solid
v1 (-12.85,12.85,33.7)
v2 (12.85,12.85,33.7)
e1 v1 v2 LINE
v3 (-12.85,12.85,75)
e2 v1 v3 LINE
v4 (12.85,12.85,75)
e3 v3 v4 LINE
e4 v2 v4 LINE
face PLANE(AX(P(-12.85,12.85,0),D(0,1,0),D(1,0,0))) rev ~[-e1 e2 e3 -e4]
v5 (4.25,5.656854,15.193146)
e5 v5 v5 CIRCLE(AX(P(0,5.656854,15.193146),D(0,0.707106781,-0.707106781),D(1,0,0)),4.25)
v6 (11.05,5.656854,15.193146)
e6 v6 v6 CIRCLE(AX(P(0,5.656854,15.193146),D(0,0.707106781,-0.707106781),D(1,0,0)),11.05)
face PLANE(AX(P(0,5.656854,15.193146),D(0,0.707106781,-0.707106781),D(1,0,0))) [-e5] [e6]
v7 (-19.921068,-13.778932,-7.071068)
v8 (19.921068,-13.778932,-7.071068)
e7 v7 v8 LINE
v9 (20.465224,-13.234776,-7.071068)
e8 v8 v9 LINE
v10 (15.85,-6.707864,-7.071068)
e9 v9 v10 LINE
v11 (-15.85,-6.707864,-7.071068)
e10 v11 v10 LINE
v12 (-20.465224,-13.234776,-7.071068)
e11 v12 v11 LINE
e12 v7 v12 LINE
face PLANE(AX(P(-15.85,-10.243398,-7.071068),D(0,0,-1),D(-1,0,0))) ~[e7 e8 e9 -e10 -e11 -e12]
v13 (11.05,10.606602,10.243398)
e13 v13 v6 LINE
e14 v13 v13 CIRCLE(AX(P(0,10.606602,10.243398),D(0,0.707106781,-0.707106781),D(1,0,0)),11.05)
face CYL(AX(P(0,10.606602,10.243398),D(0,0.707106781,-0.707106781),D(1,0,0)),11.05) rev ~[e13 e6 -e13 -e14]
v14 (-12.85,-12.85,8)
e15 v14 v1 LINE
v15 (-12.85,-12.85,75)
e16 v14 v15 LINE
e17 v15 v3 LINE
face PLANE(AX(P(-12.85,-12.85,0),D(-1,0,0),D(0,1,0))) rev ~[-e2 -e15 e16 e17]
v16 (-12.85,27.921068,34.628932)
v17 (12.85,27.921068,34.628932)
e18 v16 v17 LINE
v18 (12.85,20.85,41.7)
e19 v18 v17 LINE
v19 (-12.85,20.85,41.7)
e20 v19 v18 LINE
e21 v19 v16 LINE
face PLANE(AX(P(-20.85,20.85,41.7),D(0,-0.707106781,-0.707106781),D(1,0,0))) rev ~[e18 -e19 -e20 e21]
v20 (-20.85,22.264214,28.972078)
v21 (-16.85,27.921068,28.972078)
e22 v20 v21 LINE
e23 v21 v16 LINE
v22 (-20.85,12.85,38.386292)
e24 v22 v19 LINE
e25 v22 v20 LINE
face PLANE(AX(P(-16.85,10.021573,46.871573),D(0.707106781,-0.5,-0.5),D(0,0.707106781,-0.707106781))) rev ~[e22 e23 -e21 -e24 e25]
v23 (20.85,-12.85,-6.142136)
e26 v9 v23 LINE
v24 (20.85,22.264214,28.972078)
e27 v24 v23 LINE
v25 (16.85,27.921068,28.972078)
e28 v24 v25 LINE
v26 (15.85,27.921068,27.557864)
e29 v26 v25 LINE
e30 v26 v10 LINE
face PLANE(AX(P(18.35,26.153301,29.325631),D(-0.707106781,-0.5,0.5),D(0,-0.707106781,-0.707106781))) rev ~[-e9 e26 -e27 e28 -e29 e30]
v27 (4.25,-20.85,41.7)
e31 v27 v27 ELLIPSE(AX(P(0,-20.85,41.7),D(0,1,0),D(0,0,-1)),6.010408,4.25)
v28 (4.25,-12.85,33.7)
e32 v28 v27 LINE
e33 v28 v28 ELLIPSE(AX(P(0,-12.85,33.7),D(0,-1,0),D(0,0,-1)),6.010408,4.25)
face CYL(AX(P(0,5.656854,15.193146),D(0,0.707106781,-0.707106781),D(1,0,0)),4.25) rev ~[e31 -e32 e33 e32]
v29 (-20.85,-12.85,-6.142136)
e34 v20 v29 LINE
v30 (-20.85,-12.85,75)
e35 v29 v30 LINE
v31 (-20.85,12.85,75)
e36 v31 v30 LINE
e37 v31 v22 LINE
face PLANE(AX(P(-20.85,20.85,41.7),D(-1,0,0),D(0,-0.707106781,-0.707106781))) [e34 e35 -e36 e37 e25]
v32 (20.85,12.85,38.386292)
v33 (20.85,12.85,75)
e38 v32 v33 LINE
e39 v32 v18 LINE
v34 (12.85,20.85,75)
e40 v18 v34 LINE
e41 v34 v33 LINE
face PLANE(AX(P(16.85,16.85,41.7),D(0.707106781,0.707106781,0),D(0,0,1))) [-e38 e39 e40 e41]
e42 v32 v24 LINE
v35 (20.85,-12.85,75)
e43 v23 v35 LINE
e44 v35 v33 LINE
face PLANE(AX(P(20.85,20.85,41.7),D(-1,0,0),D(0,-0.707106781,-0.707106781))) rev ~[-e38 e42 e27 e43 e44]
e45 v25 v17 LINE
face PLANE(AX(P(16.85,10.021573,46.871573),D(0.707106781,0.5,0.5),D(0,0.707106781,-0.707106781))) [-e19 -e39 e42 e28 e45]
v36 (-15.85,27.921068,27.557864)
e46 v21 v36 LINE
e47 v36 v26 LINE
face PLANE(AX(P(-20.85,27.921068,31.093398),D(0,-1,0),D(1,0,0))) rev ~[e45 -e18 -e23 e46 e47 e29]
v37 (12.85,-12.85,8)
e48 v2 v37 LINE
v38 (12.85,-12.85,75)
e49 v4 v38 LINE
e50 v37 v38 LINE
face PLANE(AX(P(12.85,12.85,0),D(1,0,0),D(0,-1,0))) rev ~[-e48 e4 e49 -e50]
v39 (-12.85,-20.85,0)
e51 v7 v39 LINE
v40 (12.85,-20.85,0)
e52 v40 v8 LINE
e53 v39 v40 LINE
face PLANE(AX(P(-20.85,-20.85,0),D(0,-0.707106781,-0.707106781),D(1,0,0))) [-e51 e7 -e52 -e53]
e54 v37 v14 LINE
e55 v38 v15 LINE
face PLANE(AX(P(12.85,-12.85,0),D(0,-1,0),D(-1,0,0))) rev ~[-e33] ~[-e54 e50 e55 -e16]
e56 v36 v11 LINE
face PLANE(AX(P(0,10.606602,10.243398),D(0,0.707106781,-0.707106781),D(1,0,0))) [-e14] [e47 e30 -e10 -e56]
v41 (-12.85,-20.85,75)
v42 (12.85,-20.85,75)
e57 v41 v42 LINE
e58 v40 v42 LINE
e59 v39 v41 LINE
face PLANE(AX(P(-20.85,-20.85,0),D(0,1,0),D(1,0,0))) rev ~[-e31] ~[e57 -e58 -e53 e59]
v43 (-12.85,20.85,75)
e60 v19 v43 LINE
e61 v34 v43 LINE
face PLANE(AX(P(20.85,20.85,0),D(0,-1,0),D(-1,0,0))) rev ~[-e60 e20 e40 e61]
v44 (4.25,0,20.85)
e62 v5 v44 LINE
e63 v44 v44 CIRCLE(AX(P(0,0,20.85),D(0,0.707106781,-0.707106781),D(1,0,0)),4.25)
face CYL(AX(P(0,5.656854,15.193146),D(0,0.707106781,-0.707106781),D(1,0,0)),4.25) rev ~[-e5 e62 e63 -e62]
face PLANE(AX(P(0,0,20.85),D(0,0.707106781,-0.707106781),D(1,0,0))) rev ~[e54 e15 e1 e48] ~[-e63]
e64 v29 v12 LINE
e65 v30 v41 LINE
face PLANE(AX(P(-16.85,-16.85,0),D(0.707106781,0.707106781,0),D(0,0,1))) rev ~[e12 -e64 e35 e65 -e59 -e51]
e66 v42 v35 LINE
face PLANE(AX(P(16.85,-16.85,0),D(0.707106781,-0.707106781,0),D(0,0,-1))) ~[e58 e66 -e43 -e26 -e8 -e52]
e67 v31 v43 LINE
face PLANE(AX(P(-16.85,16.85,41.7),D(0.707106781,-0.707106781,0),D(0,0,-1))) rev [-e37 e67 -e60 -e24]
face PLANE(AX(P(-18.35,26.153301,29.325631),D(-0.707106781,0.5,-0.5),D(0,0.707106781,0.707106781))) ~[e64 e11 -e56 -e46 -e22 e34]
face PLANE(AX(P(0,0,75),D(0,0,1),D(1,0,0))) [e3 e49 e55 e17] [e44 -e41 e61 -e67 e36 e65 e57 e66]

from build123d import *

# Parameters (mm, degrees)
F1_DEPTH    = 75
F3_DEPTH    = 41.701
F4_W        = 41.7
F4_H        = 58.972705551
F5_DEPTH    = 15
F6_R        = 11.05
F7_DEPTH    = 7
F8_R        = 4.25
F9_DEPTH    = 61.034008589
F10_SIZE    = 8
F12_C1_SIZE = 5
F12_C2_SIZE = 5
F12_C3_SIZE = 5
F12_C4_SIZE = 5
F13_SIZE    = 8


with BuildPart() as f1:
    # F0 (on Top) → F1 (new body)
    with BuildSketch(Plane.XY):
        Polygon((20.85, 20.85), (0, 20.85), (-20.85, 20.85), (-20.85, 0), (-20.85, -20.85), (0, -20.85), (20.85, -20.85), (20.85, 0), align=None)
        Polygon((-12.85, 12.85), (0, 12.85), (12.85, 12.85), (12.85, 0), (12.85, -12.85), (0, -12.85), (-12.85, -12.85), (-12.85, 0), align=None, mode=Mode.SUBTRACT)
    extrude(amount=F1_DEPTH)

    # F2 (on face) → F3 (cut, through all)
    with BuildSketch(Plane(origin=(-20.85, 0, 0), x_dir=(0, -1, 0), z_dir=(-1, 0, 0))):
        Polygon((-20.85, 0), (20.85, 0), (-20.85, 41.7), align=None)
    extrude(amount=-F3_DEPTH, mode=Mode.SUBTRACT)

    # F4 (on face) → F5 (join)
    with BuildSketch(Plane(origin=(0, -10.425, 10.425), x_dir=(1, 0, 0), z_dir=(0, 0.7071067812, -0.7071067812))):
        with Locations((0, -14.7431763877)):
            Rectangle(F4_W, F4_H)
    extrude(amount=F5_DEPTH)

    # F6 (on face) → F7 (cut)
    with BuildSketch(Plane(origin=(0, 0.1816017178, -0.1816017178), x_dir=(1, 0, 0), z_dir=(0, 0.7071067812, -0.7071067812))):
        with Locations((0, -14.7431763877)):
            Circle(F6_R)
    extrude(amount=-F7_DEPTH, mode=Mode.SUBTRACT)

    # F8 (on face) → F9 (cut, through all)
    with BuildSketch(Plane(origin=(0, -4.7681457505, 4.7681457505), x_dir=(1, 0, 0), z_dir=(0, 0.7071067812, -0.7071067812))):
        with Locations((0, -14.7431763877)):
            Circle(F8_R)
    extrude(amount=-F9_DEPTH, mode=Mode.SUBTRACT)

    # F10
    f10_edges = [f1.edges().sort_by_distance(p)[0] for p in [
        (-20.85, -20.85, 37.5),
        (20.85, -20.85, 37.5),
        (20.85, 20.85, 58.35),
        (-20.85, 20.85, 58.35),
    ]]
    chamfer(f10_edges, length=F10_SIZE)

    # F12: chamfer of 5 on 4 edges, made by hand

    # F12_c1
    f12_c1_edges = [f1.edges().sort_by_distance(p)[0] for p in [
        (0, 31.4566017178, 31.0933982822),
    ]]
    chamfer(f12_c1_edges, length=F12_C1_SIZE)

    # F12_c2
    f12_c2_edges = [f1.edges().sort_by_distance(p)[0] for p in [
        (-20.85, 8.8388347648, 8.4756313292),
    ]]
    chamfer(f12_c2_edges, length=F12_C2_SIZE)

    # F12_c3
    f12_c3_edges = [f1.edges().sort_by_distance(p)[0] for p in [
        (20.85, 8.8388347648, 8.4756313292),
    ]]
    chamfer(f12_c3_edges, length=F12_C3_SIZE)

    # F12_c4
    f12_c4_edges = [f1.edges().sort_by_distance(p)[0] for p in [
        (0, -10.2433982822, -10.6066017178),
    ]]
    chamfer(f12_c4_edges, length=F12_C4_SIZE)

    # F13
    f13_edges = [f1.edges().sort_by_distance(p)[0] for p in [
        (20.85, 24.385534, 38.164466),
        (-20.85, 24.385534, 38.164466),
    ]]
    chamfer(f13_edges, length=F13_SIZE)


solid = f1.part
